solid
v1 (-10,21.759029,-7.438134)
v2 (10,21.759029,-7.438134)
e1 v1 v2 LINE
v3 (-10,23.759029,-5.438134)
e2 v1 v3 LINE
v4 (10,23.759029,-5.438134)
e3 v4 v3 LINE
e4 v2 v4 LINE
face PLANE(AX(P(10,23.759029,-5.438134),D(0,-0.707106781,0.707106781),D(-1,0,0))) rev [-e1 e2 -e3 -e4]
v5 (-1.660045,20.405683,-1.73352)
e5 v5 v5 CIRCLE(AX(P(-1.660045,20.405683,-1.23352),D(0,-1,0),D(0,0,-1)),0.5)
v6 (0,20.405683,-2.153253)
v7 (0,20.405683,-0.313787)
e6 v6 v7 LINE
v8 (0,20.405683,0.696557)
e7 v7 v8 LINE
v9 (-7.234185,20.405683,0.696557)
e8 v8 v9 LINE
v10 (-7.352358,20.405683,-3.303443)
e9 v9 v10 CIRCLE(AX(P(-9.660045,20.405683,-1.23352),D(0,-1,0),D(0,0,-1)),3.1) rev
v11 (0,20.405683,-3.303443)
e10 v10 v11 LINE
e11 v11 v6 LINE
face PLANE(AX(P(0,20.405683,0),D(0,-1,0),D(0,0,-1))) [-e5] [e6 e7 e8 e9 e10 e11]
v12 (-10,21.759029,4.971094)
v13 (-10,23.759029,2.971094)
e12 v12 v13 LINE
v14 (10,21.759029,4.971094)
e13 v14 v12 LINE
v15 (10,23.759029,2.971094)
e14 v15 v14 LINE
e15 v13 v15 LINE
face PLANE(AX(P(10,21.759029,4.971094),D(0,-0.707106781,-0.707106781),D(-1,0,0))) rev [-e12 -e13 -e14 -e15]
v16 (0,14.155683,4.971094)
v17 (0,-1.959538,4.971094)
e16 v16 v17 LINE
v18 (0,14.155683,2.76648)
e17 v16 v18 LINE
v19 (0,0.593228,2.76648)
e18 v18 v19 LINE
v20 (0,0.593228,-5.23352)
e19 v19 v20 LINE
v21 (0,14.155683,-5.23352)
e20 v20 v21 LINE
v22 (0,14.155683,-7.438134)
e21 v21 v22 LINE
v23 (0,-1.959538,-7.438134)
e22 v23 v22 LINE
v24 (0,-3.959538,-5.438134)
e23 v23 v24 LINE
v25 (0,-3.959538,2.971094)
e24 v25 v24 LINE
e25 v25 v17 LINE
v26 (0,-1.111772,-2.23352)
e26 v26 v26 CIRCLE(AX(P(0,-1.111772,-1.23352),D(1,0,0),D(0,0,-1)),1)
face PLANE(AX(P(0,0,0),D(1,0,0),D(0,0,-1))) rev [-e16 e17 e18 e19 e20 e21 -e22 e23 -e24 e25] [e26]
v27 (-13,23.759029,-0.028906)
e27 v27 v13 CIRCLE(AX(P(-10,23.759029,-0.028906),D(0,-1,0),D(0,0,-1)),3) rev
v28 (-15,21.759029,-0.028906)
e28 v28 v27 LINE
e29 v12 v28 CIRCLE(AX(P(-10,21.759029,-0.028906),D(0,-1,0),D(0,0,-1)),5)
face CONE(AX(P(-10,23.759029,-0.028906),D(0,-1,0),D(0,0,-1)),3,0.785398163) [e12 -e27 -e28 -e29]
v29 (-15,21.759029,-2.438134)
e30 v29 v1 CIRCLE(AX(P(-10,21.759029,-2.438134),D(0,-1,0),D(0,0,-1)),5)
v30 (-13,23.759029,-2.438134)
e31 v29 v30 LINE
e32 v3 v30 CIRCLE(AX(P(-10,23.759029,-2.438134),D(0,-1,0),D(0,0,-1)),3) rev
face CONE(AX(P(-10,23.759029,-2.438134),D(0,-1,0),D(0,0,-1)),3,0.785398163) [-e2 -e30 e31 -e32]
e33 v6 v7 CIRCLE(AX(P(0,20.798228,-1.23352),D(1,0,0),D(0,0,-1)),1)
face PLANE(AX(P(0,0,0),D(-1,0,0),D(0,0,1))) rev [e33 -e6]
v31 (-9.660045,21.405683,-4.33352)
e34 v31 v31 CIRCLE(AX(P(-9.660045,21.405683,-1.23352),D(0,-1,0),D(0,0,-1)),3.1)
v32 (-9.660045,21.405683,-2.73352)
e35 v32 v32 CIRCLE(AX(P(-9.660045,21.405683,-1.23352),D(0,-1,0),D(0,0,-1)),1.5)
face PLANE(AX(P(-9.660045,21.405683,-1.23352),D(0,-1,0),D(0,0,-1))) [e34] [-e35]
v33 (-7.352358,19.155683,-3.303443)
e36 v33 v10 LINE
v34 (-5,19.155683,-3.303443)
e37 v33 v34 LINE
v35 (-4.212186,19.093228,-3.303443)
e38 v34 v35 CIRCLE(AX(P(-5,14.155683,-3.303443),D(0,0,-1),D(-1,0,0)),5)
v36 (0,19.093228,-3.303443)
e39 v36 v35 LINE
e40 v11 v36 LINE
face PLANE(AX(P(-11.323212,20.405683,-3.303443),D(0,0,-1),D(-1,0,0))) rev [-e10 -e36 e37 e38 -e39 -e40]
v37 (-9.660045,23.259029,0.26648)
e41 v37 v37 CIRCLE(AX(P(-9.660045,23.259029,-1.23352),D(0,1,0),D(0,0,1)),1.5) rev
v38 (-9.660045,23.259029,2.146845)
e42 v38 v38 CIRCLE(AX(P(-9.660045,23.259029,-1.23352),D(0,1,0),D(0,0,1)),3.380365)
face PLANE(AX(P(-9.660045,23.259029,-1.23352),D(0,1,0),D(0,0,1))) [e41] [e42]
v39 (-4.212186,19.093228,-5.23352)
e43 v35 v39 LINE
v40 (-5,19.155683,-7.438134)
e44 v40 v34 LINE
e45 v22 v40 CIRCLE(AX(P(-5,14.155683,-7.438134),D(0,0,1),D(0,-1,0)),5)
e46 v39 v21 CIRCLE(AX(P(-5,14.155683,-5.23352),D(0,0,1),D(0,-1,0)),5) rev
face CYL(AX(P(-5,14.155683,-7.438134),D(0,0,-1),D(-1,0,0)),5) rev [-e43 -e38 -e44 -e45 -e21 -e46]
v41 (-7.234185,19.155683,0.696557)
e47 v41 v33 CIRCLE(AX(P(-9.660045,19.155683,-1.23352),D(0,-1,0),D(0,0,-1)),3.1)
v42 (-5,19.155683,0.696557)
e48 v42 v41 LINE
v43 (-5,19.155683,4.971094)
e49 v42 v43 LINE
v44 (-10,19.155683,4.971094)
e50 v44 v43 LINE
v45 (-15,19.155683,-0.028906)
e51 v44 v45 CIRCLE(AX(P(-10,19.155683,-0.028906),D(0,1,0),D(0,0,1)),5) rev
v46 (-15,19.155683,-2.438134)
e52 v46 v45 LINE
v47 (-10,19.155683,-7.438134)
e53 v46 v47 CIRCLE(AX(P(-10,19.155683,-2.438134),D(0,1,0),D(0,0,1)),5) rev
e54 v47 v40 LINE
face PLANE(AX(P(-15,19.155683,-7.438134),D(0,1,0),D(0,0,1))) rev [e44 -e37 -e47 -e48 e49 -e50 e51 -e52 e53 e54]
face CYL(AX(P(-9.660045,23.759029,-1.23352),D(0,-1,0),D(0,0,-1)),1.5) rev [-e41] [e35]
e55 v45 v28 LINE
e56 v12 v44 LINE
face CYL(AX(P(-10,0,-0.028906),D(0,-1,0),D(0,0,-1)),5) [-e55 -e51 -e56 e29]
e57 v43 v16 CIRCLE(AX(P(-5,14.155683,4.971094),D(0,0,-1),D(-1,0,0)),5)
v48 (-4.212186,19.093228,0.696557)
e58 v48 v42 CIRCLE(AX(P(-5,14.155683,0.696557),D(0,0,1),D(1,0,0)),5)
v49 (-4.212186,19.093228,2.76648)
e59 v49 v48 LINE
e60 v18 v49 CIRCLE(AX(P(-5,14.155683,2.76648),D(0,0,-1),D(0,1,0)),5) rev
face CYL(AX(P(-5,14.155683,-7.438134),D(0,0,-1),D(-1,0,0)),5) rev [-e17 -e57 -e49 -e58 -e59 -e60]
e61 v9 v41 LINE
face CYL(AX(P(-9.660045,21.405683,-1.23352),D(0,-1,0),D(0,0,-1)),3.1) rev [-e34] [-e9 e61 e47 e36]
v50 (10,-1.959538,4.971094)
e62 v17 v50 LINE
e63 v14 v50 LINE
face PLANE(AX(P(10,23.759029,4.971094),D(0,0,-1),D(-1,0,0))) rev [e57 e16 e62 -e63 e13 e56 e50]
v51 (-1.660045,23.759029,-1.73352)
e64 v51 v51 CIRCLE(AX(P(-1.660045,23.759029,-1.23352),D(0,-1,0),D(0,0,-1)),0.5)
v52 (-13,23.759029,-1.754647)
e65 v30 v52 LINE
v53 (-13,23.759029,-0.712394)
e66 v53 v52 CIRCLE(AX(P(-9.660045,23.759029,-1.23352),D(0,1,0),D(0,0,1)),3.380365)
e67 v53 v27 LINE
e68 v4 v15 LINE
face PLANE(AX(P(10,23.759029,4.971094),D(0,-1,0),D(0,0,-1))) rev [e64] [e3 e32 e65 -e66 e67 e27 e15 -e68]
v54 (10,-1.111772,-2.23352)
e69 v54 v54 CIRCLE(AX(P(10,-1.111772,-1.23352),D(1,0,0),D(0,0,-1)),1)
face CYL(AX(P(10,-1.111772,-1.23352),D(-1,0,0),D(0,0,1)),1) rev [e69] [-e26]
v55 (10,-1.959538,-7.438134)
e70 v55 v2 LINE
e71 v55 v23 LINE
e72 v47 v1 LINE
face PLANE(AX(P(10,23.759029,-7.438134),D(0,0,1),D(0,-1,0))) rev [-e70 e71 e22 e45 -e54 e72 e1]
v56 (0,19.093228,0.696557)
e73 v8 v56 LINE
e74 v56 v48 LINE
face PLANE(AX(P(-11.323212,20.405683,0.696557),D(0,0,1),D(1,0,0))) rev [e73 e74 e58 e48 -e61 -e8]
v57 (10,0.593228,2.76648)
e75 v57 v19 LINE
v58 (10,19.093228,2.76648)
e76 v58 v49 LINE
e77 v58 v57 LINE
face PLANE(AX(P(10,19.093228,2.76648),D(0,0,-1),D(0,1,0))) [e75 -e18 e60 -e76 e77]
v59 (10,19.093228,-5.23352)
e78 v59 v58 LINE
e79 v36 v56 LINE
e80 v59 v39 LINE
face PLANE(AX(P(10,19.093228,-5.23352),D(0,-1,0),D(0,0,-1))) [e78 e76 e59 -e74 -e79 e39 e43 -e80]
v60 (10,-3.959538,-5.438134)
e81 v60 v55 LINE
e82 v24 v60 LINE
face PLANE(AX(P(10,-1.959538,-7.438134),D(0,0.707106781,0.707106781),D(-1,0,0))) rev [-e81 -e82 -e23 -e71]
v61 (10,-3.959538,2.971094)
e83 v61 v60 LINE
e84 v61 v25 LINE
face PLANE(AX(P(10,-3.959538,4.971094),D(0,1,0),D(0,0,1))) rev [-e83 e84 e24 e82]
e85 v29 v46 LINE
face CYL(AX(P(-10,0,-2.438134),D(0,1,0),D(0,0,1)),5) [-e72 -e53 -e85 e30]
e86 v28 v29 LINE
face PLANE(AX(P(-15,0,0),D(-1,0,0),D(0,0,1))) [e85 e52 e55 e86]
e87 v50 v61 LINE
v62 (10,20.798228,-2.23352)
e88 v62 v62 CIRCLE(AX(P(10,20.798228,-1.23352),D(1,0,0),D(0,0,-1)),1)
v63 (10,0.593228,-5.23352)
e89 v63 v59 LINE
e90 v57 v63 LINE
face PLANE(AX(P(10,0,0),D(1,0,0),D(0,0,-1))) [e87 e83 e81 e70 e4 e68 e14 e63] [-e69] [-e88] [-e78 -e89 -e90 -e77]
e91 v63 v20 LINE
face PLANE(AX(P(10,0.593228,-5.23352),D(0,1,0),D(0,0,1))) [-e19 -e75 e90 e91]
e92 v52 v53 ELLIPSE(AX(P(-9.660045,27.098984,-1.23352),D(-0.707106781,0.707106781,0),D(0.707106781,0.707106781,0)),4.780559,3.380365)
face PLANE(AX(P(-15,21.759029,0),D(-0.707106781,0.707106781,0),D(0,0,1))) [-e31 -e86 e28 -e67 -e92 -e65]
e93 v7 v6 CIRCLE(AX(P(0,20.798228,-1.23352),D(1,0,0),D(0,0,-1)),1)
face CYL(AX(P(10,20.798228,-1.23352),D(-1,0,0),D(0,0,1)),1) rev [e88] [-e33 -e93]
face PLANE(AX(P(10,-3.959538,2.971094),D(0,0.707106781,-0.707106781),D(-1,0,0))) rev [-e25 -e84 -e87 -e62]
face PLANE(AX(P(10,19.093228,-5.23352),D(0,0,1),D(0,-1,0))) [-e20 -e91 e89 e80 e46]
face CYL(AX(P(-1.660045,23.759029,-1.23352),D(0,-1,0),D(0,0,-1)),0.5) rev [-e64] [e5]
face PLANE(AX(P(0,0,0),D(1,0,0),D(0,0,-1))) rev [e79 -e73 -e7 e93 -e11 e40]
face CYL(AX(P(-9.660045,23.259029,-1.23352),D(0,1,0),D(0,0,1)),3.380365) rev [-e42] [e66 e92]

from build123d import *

# Parameters (mm, degrees)
SKETCH1_W               = 12.409227922
SKETCH1_H               = 27.718567262
SKETCH1_R               = 1
SKETCH1_W_2             = 8
SKETCH1_H_2             = 18.5
BOSS_EXTRUDE1_DEPTH     = 10
SKETCH6_W               = 12.409227922
SKETCH6_H               = 4.603346058
BOSS_EXTRUDE3_DEPTH     = 15
SKETCH7_R               = 3.1
CUT_EXTRUDE4_DEPTH      = 2.25
SKETCH8_W               = 11.323212184
SKETCH8_H               = 4
CUT_EXTRUDE5_DEPTH      = 1.25
CUT_EXTRUDE7_DEPTH      = 31.392767012
CUT_EXTRUDE7_DEPTH_BACK = 31.392767012
SKETCH9_R               = 1.5
SKETCH9_R_2             = 0.5
FILLET2_R               = 5
SKETCH10_R              = 3.380365375
CUT_EXTRUDE8_DEPTH      = 0.5
CHAMFER3_SIZE           = 2
FILLET3_R               = 5


with BuildPart() as part:
    # Sketch1 → Boss-Extrude1 (new body)
    with BuildSketch(Plane(origin=(0, 0, 0), x_dir=(0, 0, -1), z_dir=(1, 0, 0))):
        with Locations((1.233520205, 9.89974551)):
            Rectangle(SKETCH1_W, SKETCH1_H)
        with Locations((1.233520205, 20.798227972)):
            Circle(SKETCH1_R, mode=Mode.SUBTRACT)
        with Locations((1.233520205, -1.111772028)):
            Circle(SKETCH1_R, mode=Mode.SUBTRACT)
        with Locations((1.233520205, 9.843227972)):
            Rectangle(SKETCH1_W_2, SKETCH1_H_2, mode=Mode.SUBTRACT)
    extrude(amount=BOSS_EXTRUDE1_DEPTH)

    # Sketch6 → Boss-Extrude3 (add)
    with BuildSketch(Plane.ZY):
        with Locations((-1.233520205, 21.457356112)):
            Rectangle(SKETCH6_W, SKETCH6_H)
    extrude(amount=BOSS_EXTRUDE3_DEPTH)

    # Sketch7 → Cut-Extrude4 (cut)
    with BuildSketch(Plane.XZ.offset(-19.155683083)):
        with Locations(Location((-9.660045294, -1.233520205, 0), (0, 0, 270))):
            Circle(SKETCH7_R)
    extrude(amount=-CUT_EXTRUDE4_DEPTH, mode=Mode.SUBTRACT)

    # Sketch8 → Cut-Extrude5 (cut)
    with BuildSketch(Plane.XZ.offset(-19.155683083)):
        with Locations((-5.661606092, -1.303442539)):
            Rectangle(SKETCH8_W, SKETCH8_H)
    extrude(amount=-CUT_EXTRUDE5_DEPTH, mode=Mode.SUBTRACT)

    # Sketch9 → Cut-Extrude7 (cut, two sides: drawn at the far end of the back side and taken through both)
    with BuildSketch(Plane.XZ.offset(-21.405683083).offset(-CUT_EXTRUDE7_DEPTH_BACK)):
        with Locations(Location((-9.660045294, -1.233520205, 0), (0, 0, 270))):
            Circle(SKETCH9_R)
        with Locations(Location((-1.660045294, -1.233520205, 0), (0, 0, 270))):
            Circle(SKETCH9_R_2)
    extrude(amount=CUT_EXTRUDE7_DEPTH + CUT_EXTRUDE7_DEPTH_BACK, mode=Mode.SUBTRACT)

    # Fillet2
    fillet2_edges = [part.edges().sort_by_distance(p)[0] for p in [
        (-15, 21.457356112, -7.438134166),
        (-15, 21.457356112, 4.971093756),
    ]]
    fillet(fillet2_edges, radius=FILLET2_R)

    # Sketch10 → Cut-Extrude8 (cut)
    with BuildSketch(Plane(origin=(0, 23.759029141, 0), x_dir=(1, 0, 0), z_dir=(0, 1, 0))):
        with Locations(Location((-9.660045294, 1.233520205, 0), (0, 0, 270))):
            Circle(SKETCH10_R)
    extrude(amount=-CUT_EXTRUDE8_DEPTH, mode=Mode.SUBTRACT)

    # Chamfer3
    # the kernel refuses this chamfer: 2 mm, written as the material it takes off along each edge
    with BuildSketch(Plane(origin=(-5.143365976, -3.959538121, -7.438134166), x_dir=(0, 0.9996219169112968, -0.027495876610586487), z_dir=(1, 0, 0))) as chamfer3_piece_1:
        Polygon((CHAMFER3_SIZE * 0.999621916911, CHAMFER3_SIZE * 0.0274958766106), (-CHAMFER3_SIZE * 0.0274958766106, CHAMFER3_SIZE * 0.999621916911), (0, 0), align=None)
    extrude(amount=20.286731952, mode=Mode.SUBTRACT)
    with BuildSketch(Plane(origin=(-5.143365976, -3.959538121, 4.971093756), x_dir=(0, 0.9996219169112968, 0.027495876610586487), z_dir=(1, 0, 0))) as chamfer3_piece_2:
        Polygon((CHAMFER3_SIZE * 0.999621916911, -CHAMFER3_SIZE * 0.0274958766106), (-CHAMFER3_SIZE * 0.0274958766106, -CHAMFER3_SIZE * 0.999621916911), (0, 0), align=None)
    extrude(amount=20.286731952, mode=Mode.SUBTRACT)
    with BuildSketch(Plane(origin=(-10, 23.759029141, 4.971093756), x_dir=(0, 0.02749587661058563, -0.9996219169112968), z_dir=(1, 0, 0)), Plane(origin=(15.143365976, 23.759029141, -7.438134166), x_dir=(0, 0.027495876610585623, 0.9996219169112968), z_dir=(-1, 0, 0))) as chamfer3_piece_3:
        Polygon((CHAMFER3_SIZE * 0.999621916911, -CHAMFER3_SIZE * 0.0274958766106), (-CHAMFER3_SIZE * 0.0274958766106, -CHAMFER3_SIZE * 0.999621916911), (0, 0), align=None)
    extrude(amount=25.143365976, mode=Mode.SUBTRACT)
    with BuildSketch(Plane(origin=(-15, 23.759029141, -2.438134166), x_dir=(0.9996219169112968, 0.027495876610585623, 0), z_dir=(0, 0, 1))) as chamfer3_piece_4:
        Polygon((CHAMFER3_SIZE * 0.999621916911, -CHAMFER3_SIZE * 0.0274958766106), (-CHAMFER3_SIZE * 0.0274958766106, -CHAMFER3_SIZE * 0.999621916911), (0, 0), align=None)
    extrude(amount=2.409227923, mode=Mode.SUBTRACT)
    with BuildSketch(Plane(origin=(-10, 23.759029141, -0.028906244), x_dir=(-1, 0, 0), z_dir=(0, 0, -1))) as chamfer3_piece_5:
        Polygon((5 - CHAMFER3_SIZE, 0), (5, -CHAMFER3_SIZE), (5, 0), align=None)
    revolve(axis=Axis((-10, 23.759029141, -0.028906244), (0, 1, 0)), revolution_arc=90, mode=Mode.SUBTRACT)
    with BuildSketch(Plane(origin=(-10, 23.759029141, -2.438134166), x_dir=(-1, 0, 0), z_dir=(0, 0, 1))) as chamfer3_piece_6:
        Polygon((5 - CHAMFER3_SIZE, 0), (5, CHAMFER3_SIZE), (5, 0), align=None)
    revolve(axis=Axis((-10, 23.759029141, -2.438134166), (0, -1, 0)), revolution_arc=90, mode=Mode.SUBTRACT)

    # Fillet3
    # the kernel refuses this fillet: 5 mm, written as the material it adds along each edge
    with BuildSketch(Plane(origin=(0, 19.155683083, 9.196557461), x_dir=(-1, 0, 0), z_dir=(0, 0, -1))) as fillet3_piece_1_section:
        with BuildLine():
            CenterArc((FILLET3_R, -FILLET3_R), FILLET3_R, 90, 90)
            Line((0, -FILLET3_R), (0, 0))
            Line((0, 0), (FILLET3_R, 0))
        make_face()
    fillet3_piece_1 = extrude(amount=29.134691627, mode=Mode.PRIVATE)
    fillet3_piece_1 = split(fillet3_piece_1, bisect_by=Plane(origin=(-2.240914142, 19.125188019, 4.971093756), z_dir=(0, 0, -1)), keep=Keep.TOP, mode=Mode.PRIVATE)
    fillet3_piece_1 = split(fillet3_piece_1, bisect_by=Plane(origin=(-2.240914142, 19.093227972, 3.868786776), z_dir=(0, 1, 0)), keep=Keep.TOP, mode=Mode.PRIVATE)
    fillet3_piece_1 = split(fillet3_piece_1, bisect_by=Plane(origin=(-2.240914142, 19.125188019, 0.696557461), z_dir=(0, 0, 1)), keep=Keep.TOP, mode=Mode.PRIVATE)
    add(fillet3_piece_1)
    with BuildSketch(Plane(origin=(0, 19.155683083, 9.196557461), x_dir=(-1, 0, 0), z_dir=(0, 0, -1))) as fillet3_piece_2_section:
        with BuildLine():
            CenterArc((FILLET3_R, -FILLET3_R), FILLET3_R, 90, 90)
            Line((0, -FILLET3_R), (0, 0))
            Line((0, 0), (FILLET3_R, 0))
        make_face()
    fillet3_piece_2 = extrude(amount=29.134691627, mode=Mode.PRIVATE)
    fillet3_piece_2 = split(fillet3_piece_2, bisect_by=Plane(origin=(-1.055076688, 17.979153471, 4.971093756), z_dir=(0, 0, -1)), keep=Keep.TOP, mode=Mode.PRIVATE)
    fillet3_piece_2 = split(fillet3_piece_2, bisect_by=Plane(origin=(-1.055076688, 17.979153471, 2.766479795), z_dir=(0, 0, 1)), keep=Keep.TOP, mode=Mode.PRIVATE)
    add(fillet3_piece_2)
    with BuildSketch(Plane(origin=(0, 19.155683083, -3.303442539), x_dir=(-1, 0, 0), z_dir=(0, 0, -1))) as fillet3_piece_3_section:
        with BuildLine():
            CenterArc((FILLET3_R, -FILLET3_R), FILLET3_R, 90, 90)
            Line((0, -FILLET3_R), (0, 0))
            Line((0, 0), (FILLET3_R, 0))
        make_face()
    fillet3_piece_3 = extrude(amount=4.134691627, mode=Mode.PRIVATE)
    fillet3_piece_3 = split(fillet3_piece_3, bisect_by=Plane(origin=(-2.240914142, 19.093227972, -4.268481372), z_dir=(0, 1, 0)), keep=Keep.TOP, mode=Mode.PRIVATE)
    add(fillet3_piece_3)
    with BuildSketch(Plane(origin=(0, 19.155683083, 9.196557461), x_dir=(-1, 0, 0), z_dir=(0, 0, -1))) as fillet3_piece_4_section:
        with BuildLine():
            CenterArc((FILLET3_R, -FILLET3_R), FILLET3_R, 90, 90)
            Line((0, -FILLET3_R), (0, 0))
            Line((0, 0), (FILLET3_R, 0))
        make_face()
    fillet3_piece_4 = extrude(amount=16.634691627, mode=Mode.PRIVATE)
    fillet3_piece_4 = split(fillet3_piece_4, bisect_by=Plane(origin=(-1.055076688, 17.979153471, -5.233520205), z_dir=(0, 0, -1)), keep=Keep.TOP, mode=Mode.PRIVATE)
    add(fillet3_piece_4)
    with BuildSketch(Plane(origin=(0, 19.155683083, 4.971093756), x_dir=(-1, 0, 0), z_dir=(0, 0, -1))) as fillet3_piece_5_section:
        with BuildLine():
            CenterArc((FILLET3_R, -FILLET3_R), FILLET3_R, 90, 90)
            Line((0, -FILLET3_R), (0, 0))
            Line((0, 0), (FILLET3_R, 0))
        make_face()
    fillet3_piece_5 = extrude(amount=4.274536296, mode=Mode.PRIVATE)
    fillet3_piece_5 = split(fillet3_piece_5, bisect_by=Plane(origin=(-2.240914142, 19.093227972, 3.868786776), z_dir=(0, 1, 0)), keep=Keep.TOP, mode=Mode.PRIVATE)
    add(fillet3_piece_5)
    with BuildSketch(Plane(origin=(0, 19.155683083, 4.971093756), x_dir=(-1, 0, 0), z_dir=(0, 0, -1))) as fillet3_piece_6_section:
        with BuildLine():
            CenterArc((FILLET3_R, -FILLET3_R), FILLET3_R, 90, 90)
            Line((0, -FILLET3_R), (0, 0))
            Line((0, 0), (FILLET3_R, 0))
        make_face()
    fillet3_piece_6 = extrude(amount=16.774536296, mode=Mode.PRIVATE)
    fillet3_piece_6 = split(fillet3_piece_6, bisect_by=Plane(origin=(-1.055076688, 17.979153471, 2.766479795), z_dir=(0, 0, 1)), keep=Keep.TOP, mode=Mode.PRIVATE)
    add(fillet3_piece_6)
    with BuildSketch(Plane(origin=(0, 19.155683083, 17.471093756), x_dir=(-1, 0, 0), z_dir=(0, 0, -1))) as fillet3_piece_7_section:
        with BuildLine():
            CenterArc((FILLET3_R, -FILLET3_R), FILLET3_R, 90, 90)
            Line((0, -FILLET3_R), (0, 0))
            Line((0, 0), (FILLET3_R, 0))
        make_face()
    fillet3_piece_7 = extrude(amount=29.274536296, mode=Mode.PRIVATE)
    fillet3_piece_7 = split(fillet3_piece_7, bisect_by=Plane(origin=(-2.240914142, 19.125188019, -7.438134166), z_dir=(0, 0, 1)), keep=Keep.TOP, mode=Mode.PRIVATE)
    fillet3_piece_7 = split(fillet3_piece_7, bisect_by=Plane(origin=(-2.240914142, 19.093227972, -4.268481372), z_dir=(0, 1, 0)), keep=Keep.TOP, mode=Mode.PRIVATE)
    fillet3_piece_7 = split(fillet3_piece_7, bisect_by=Plane(origin=(-2.240914142, 19.125188019, -3.303442539), z_dir=(0, 0, -1)), keep=Keep.TOP, mode=Mode.PRIVATE)
    add(fillet3_piece_7)
    with BuildSketch(Plane(origin=(0, 19.155683083, 17.471093756), x_dir=(-1, 0, 0), z_dir=(0, 0, -1))) as fillet3_piece_8_section:
        with BuildLine():
            CenterArc((FILLET3_R, -FILLET3_R), FILLET3_R, 90, 90)
            Line((0, -FILLET3_R), (0, 0))
            Line((0, 0), (FILLET3_R, 0))
        make_face()
    fillet3_piece_8 = extrude(amount=29.274536296, mode=Mode.PRIVATE)
    fillet3_piece_8 = split(fillet3_piece_8, bisect_by=Plane(origin=(-1.055076688, 17.979153471, -7.438134166), z_dir=(0, 0, 1)), keep=Keep.TOP, mode=Mode.PRIVATE)
    fillet3_piece_8 = split(fillet3_piece_8, bisect_by=Plane(origin=(-1.055076688, 17.979153471, -5.233520205), z_dir=(0, 0, -1)), keep=Keep.TOP, mode=Mode.PRIVATE)
    add(fillet3_piece_8)


solid = part.part
